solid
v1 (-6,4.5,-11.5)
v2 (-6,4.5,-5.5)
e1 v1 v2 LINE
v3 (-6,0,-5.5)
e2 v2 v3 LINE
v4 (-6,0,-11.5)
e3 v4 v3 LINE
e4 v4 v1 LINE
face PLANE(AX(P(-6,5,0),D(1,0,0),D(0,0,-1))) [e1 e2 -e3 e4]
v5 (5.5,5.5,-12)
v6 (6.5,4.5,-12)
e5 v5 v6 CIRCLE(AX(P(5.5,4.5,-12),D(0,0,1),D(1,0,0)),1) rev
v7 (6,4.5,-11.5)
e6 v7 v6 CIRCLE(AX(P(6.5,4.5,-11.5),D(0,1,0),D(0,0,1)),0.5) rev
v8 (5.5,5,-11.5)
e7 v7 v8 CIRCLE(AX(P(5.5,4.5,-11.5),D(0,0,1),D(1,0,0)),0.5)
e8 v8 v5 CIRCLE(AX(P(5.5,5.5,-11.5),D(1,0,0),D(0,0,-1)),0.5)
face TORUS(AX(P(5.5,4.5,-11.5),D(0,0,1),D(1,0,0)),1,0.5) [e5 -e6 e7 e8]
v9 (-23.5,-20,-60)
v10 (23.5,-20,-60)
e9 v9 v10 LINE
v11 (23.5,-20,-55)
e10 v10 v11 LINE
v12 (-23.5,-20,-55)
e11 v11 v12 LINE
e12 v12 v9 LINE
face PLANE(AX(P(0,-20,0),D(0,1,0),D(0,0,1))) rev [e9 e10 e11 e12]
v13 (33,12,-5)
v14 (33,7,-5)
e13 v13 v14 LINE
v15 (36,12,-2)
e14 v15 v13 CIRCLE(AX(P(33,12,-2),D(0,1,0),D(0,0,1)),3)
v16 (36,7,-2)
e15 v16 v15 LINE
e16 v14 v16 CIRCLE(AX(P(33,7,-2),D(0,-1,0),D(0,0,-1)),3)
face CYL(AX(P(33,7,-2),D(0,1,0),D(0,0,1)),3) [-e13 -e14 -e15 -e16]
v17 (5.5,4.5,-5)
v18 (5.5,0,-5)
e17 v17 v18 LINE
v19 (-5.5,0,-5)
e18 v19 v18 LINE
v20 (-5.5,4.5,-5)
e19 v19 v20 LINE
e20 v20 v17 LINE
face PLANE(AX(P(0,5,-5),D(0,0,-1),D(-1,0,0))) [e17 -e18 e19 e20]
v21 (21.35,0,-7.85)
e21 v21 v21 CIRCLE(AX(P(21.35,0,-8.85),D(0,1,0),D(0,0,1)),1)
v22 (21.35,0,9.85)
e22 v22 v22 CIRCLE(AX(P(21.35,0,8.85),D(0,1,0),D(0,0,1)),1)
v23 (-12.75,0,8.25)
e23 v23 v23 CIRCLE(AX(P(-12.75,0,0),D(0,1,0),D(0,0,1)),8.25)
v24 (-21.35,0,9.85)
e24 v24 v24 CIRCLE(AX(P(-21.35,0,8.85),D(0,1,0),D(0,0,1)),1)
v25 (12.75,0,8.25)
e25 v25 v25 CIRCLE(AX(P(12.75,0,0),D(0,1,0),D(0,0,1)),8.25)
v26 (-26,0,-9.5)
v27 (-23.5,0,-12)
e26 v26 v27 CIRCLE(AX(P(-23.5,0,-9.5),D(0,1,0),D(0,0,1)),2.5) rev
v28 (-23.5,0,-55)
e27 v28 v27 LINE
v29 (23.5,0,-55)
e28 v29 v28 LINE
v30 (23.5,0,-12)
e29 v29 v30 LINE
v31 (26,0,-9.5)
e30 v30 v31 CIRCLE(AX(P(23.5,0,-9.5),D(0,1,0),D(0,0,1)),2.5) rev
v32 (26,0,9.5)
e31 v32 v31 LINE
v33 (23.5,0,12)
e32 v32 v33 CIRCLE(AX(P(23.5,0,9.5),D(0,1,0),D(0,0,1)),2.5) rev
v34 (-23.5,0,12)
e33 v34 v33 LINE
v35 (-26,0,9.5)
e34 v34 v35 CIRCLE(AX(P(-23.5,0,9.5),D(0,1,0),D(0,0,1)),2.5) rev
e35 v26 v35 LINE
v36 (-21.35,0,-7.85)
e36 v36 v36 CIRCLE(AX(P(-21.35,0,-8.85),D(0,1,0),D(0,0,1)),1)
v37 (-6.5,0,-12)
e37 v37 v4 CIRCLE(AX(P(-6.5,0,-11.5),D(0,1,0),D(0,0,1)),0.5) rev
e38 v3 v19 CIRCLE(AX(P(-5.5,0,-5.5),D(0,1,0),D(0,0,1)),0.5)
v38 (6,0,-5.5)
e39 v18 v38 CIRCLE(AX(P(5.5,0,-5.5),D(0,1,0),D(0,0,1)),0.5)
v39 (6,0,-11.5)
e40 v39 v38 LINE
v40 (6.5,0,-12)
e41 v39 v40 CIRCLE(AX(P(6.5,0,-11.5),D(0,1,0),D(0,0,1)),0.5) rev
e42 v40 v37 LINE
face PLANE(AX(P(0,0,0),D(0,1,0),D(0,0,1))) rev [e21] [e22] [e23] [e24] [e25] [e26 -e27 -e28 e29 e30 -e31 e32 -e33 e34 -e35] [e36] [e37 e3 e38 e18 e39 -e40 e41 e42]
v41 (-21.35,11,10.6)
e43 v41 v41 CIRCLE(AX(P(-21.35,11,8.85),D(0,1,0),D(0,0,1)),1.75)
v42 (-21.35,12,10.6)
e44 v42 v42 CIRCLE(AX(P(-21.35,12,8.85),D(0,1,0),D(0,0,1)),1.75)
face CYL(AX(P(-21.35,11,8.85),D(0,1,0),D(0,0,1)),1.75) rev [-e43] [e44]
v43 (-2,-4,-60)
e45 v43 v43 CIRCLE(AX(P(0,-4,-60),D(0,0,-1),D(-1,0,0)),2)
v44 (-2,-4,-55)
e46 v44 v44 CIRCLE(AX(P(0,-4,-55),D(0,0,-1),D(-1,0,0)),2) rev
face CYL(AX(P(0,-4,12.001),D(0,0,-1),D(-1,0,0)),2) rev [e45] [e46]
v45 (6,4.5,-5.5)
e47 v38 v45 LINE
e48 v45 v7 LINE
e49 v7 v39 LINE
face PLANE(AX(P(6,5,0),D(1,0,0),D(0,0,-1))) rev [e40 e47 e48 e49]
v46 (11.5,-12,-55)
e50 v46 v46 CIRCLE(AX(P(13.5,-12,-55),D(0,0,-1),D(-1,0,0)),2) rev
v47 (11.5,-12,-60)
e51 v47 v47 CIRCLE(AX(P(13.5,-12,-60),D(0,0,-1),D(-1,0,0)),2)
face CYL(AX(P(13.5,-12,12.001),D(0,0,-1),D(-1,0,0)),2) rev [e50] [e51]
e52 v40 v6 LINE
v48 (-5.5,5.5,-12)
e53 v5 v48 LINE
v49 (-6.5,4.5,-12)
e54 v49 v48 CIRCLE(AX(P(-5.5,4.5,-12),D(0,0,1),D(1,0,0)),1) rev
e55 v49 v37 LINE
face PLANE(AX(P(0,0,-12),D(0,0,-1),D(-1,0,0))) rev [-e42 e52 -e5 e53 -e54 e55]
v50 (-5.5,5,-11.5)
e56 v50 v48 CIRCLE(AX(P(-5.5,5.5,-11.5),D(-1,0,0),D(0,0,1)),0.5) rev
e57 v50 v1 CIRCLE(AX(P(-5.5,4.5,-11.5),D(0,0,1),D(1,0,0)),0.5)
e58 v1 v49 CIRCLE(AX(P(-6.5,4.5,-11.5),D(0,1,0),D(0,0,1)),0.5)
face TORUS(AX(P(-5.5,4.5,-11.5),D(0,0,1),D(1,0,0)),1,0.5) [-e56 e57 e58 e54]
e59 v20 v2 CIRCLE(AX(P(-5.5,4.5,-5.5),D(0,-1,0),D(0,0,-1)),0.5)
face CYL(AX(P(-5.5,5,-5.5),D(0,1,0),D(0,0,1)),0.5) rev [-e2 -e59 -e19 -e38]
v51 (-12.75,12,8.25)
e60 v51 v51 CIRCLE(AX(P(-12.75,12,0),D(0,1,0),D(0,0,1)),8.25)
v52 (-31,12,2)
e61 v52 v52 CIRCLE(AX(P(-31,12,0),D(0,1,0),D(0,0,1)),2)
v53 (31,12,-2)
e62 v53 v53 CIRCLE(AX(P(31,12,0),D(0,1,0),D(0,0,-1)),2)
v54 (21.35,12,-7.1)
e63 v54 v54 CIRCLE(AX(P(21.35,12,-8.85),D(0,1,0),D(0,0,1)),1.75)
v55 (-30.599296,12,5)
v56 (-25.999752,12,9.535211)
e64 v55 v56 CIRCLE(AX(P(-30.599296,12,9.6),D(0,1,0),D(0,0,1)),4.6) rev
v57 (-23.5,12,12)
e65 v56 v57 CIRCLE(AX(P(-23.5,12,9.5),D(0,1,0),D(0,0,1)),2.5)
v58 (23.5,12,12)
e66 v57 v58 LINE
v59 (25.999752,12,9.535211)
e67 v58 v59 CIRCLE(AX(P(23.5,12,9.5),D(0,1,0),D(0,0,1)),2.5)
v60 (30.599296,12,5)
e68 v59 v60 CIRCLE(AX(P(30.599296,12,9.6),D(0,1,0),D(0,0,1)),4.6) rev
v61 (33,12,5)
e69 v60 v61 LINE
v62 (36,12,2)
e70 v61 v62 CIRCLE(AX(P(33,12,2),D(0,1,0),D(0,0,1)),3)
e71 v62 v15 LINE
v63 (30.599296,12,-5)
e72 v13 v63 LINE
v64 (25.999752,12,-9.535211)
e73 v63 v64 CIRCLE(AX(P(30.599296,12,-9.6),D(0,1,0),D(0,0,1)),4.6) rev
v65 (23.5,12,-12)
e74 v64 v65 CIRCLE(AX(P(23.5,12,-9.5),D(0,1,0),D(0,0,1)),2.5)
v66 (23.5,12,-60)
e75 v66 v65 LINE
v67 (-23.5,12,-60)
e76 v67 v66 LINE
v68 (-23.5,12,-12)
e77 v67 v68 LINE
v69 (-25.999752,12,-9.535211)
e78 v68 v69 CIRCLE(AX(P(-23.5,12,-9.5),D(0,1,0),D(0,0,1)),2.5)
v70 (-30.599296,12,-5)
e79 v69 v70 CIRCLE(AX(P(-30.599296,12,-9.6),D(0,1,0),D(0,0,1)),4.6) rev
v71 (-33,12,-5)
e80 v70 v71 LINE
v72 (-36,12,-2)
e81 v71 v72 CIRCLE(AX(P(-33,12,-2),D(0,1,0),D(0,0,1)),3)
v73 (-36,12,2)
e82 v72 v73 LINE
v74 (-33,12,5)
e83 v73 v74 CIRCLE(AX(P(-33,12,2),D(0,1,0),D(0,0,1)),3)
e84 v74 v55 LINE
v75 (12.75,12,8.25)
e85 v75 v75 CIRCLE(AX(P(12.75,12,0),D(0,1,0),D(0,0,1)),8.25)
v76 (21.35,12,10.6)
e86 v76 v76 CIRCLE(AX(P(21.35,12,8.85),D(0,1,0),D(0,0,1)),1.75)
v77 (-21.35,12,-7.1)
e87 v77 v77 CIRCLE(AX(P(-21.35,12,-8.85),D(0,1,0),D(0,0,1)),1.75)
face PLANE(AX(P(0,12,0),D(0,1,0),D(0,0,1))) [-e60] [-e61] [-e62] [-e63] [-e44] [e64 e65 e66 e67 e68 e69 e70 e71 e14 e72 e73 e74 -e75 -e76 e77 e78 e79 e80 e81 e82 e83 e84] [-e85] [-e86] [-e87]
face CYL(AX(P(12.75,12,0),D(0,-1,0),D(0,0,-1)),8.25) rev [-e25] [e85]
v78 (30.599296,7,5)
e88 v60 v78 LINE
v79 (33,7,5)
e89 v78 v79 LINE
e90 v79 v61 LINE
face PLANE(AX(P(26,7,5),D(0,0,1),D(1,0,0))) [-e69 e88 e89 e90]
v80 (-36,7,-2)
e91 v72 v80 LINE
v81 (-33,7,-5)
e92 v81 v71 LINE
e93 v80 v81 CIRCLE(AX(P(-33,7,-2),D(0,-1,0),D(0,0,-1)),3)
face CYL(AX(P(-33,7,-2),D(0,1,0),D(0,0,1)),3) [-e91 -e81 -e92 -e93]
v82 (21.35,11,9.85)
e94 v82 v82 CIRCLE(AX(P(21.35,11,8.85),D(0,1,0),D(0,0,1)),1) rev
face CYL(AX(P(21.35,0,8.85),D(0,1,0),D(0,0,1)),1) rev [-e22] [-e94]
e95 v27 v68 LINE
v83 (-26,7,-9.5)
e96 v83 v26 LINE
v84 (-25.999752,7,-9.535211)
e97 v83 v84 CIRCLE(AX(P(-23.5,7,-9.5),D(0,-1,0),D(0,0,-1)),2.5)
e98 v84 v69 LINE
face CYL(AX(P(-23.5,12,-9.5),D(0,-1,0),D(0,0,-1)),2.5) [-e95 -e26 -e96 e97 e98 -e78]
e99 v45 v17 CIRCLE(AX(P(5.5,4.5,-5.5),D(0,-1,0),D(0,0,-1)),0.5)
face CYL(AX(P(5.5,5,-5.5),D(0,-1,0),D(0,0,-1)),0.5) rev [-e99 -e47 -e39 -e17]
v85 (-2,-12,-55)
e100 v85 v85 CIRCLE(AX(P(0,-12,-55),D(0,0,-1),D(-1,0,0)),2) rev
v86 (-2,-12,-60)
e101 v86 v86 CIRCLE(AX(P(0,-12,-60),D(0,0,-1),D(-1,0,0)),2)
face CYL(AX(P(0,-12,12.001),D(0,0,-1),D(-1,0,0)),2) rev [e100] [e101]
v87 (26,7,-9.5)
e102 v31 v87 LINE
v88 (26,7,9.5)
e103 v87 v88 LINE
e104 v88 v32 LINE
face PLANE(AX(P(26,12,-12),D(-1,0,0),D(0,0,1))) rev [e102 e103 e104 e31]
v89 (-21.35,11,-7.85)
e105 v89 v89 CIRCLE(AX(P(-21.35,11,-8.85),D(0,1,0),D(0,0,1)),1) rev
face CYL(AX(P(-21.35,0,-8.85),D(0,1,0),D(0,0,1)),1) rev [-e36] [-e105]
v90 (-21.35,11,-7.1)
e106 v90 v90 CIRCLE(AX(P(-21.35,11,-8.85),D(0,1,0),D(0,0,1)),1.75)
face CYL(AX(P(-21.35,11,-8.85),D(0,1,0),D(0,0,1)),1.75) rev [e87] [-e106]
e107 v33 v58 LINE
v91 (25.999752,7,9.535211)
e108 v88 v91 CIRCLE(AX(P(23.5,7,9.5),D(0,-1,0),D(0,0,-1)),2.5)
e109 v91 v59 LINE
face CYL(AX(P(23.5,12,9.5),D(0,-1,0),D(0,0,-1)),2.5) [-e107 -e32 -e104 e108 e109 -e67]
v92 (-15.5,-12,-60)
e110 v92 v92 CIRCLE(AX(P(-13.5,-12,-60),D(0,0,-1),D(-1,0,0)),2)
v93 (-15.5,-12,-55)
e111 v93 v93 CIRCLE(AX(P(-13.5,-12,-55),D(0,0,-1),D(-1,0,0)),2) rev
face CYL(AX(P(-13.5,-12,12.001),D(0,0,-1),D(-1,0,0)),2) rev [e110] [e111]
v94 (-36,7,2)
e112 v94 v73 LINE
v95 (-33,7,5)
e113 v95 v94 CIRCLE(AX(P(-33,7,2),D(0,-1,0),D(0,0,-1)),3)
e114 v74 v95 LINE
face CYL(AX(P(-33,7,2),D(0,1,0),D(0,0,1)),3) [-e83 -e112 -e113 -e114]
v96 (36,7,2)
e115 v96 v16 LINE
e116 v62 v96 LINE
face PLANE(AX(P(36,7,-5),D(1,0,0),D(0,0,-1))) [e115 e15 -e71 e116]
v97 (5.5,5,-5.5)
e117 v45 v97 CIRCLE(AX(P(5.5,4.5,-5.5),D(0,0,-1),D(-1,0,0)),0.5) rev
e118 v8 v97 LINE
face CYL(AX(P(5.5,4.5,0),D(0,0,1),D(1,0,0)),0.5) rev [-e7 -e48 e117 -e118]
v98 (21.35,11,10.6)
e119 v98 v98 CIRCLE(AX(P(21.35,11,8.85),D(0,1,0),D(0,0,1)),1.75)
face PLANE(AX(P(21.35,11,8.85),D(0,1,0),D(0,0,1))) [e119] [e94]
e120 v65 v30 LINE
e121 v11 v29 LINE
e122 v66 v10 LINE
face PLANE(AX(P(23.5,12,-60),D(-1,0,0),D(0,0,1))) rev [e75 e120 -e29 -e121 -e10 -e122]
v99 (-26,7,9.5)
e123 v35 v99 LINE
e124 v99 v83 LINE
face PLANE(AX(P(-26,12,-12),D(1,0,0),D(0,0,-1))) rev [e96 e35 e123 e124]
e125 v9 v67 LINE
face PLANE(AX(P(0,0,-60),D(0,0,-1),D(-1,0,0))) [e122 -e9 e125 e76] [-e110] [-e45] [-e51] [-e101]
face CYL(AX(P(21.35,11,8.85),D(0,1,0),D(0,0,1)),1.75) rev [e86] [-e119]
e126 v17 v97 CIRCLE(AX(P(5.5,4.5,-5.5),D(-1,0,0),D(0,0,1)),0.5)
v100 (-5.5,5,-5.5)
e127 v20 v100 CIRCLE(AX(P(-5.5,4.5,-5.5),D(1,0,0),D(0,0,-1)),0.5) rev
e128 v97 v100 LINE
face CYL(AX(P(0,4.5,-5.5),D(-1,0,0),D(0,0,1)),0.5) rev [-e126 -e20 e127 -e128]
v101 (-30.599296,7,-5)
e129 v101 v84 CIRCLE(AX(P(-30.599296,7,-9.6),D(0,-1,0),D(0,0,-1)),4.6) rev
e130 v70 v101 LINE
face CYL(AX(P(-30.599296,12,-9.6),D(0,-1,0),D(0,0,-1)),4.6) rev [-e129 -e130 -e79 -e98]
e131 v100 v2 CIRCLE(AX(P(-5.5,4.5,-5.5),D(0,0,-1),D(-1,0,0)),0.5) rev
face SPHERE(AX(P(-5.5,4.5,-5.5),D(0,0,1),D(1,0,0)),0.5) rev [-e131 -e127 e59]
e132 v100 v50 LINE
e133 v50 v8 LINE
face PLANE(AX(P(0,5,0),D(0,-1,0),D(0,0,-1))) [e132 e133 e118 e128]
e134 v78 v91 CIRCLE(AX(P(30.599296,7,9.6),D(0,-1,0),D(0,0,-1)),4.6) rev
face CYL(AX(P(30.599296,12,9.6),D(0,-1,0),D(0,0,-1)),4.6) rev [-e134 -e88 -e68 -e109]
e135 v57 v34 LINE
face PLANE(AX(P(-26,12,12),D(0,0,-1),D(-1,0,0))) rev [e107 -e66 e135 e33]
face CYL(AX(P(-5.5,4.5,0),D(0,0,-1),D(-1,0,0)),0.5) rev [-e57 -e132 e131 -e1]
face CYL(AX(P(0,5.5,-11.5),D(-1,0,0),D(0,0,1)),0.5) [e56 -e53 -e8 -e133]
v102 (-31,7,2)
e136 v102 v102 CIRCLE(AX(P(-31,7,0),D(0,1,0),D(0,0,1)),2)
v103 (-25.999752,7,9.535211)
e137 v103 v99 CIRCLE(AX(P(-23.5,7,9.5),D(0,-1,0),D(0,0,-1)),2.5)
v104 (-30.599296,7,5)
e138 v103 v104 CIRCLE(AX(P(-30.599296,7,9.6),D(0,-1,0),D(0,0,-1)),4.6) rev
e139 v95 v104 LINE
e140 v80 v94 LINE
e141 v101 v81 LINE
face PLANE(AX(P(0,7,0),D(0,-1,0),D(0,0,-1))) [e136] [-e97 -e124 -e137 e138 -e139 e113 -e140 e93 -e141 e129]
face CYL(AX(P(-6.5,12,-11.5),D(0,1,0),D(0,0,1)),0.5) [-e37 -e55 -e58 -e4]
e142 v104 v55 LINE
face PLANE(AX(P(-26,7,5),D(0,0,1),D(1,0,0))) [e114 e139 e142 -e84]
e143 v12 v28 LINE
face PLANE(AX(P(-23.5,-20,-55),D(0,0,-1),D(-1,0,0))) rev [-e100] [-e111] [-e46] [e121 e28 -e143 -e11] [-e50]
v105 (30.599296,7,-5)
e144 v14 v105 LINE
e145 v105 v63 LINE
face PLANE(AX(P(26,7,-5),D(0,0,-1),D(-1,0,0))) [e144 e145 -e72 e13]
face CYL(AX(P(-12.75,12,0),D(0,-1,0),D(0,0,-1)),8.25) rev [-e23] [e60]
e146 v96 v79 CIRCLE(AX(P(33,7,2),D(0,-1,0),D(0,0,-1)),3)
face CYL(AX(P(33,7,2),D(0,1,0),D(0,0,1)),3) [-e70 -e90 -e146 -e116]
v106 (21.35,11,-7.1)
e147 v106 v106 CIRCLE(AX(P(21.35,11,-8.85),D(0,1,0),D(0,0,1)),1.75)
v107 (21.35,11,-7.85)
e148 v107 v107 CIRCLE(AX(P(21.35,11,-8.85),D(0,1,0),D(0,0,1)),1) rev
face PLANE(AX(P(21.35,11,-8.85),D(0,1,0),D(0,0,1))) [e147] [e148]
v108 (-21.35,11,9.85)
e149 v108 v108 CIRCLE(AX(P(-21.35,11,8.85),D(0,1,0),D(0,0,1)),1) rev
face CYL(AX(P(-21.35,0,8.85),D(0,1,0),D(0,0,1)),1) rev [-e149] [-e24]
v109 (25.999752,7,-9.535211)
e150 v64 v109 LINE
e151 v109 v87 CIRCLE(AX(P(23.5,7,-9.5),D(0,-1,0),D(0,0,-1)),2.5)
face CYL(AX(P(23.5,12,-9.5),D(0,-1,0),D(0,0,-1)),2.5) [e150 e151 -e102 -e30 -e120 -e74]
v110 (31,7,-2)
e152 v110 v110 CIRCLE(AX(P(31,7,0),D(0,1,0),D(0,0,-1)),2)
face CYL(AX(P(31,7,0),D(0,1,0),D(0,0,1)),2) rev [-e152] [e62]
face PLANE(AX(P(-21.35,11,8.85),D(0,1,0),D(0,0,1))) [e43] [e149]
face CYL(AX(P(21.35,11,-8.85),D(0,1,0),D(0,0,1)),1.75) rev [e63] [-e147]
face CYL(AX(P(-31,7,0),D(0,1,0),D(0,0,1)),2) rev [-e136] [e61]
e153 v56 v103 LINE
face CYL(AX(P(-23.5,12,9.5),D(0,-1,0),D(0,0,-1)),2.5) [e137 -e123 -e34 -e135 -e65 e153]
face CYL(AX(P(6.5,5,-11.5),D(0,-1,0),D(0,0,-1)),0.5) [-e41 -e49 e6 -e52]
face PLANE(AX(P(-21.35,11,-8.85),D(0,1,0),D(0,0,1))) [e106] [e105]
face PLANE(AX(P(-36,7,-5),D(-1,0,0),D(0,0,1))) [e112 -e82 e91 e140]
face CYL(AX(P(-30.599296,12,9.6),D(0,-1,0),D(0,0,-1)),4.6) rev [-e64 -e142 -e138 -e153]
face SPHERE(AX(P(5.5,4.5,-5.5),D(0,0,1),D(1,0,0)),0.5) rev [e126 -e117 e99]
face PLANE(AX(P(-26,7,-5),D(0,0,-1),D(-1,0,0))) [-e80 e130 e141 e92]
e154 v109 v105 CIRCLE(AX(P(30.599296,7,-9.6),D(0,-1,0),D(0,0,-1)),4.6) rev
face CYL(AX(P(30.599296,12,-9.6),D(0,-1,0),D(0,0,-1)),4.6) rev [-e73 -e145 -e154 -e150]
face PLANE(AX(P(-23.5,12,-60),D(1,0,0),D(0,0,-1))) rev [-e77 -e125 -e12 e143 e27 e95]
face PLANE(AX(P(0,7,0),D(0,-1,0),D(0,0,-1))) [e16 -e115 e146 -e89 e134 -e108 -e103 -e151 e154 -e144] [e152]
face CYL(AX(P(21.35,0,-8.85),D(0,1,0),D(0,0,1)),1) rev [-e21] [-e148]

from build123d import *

# Parameters (mm, degrees)
SKETCH1_W           = 52
SKETCH1_H           = 24
SKETCH1_R           = 8.25
BOSS_EXTRUDE1_DEPTH = 12
SKETCH2_R           = 1
CUT_EXTRUDE1_DEPTH  = 32.048349393
SKETCH3_R           = 1.75
CUT_EXTRUDE2_DEPTH  = 1
FILLET1_R           = 2.5
CUT_EXTRUDE3_DEPTH  = 5
FILLET2_R           = 0.5
SKETCH6_W           = 10
SKETCH6_H           = 10
SKETCH6_R           = 2
BOSS_EXTRUDE2_DEPTH = 5
FILLET3_R           = 4.6
FILLET4_R           = 3
SKETCH9_W           = 47
SKETCH9_H           = 12
BOSS_EXTRUDE3_DEPTH = 48
SKETCH11_W          = 47
SKETCH11_H          = 5
BOSS_EXTRUDE5_DEPTH = 20
CUT_EXTRUDE5_REACH  = 84.946
SKETCH13_R          = 2
CUT_EXTRUDE6_REACH  = 84.946
SKETCH16_R          = 2


with BuildPart() as part:
    # Sketch1 → Boss-Extrude1 (new body)
    with BuildSketch(Plane(origin=(0, 0, 0), x_dir=(1, 0, 0), z_dir=(0, 1, 0))):
        Rectangle(SKETCH1_W, SKETCH1_H)
        with Locations(Location((12.75, 0, 0), (0, 0, 270))):
            Circle(SKETCH1_R, mode=Mode.SUBTRACT)
        with Locations(Location((-12.75, 0, 0), (0, 0, 270))):
            Circle(SKETCH1_R, mode=Mode.SUBTRACT)
    extrude(amount=BOSS_EXTRUDE1_DEPTH)

    # Sketch2 → Cut-Extrude1 (cut, through all)
    with BuildSketch(Plane(origin=(0, 12, 0), x_dir=(1, 0, 0), z_dir=(0, 1, 0))):
        with Locations(Location((-21.35, 8.85, 0), (0, 0, 270))):
            Circle(SKETCH2_R)
        with Locations(Location((21.35, 8.85, 0), (0, 0, 270))):
            Circle(SKETCH2_R)
        with Locations(Location((21.35, -8.85, 0), (0, 0, 270))):
            Circle(SKETCH2_R)
        with Locations(Location((-21.35, -8.85, 0), (0, 0, 270))):
            Circle(SKETCH2_R)
    extrude(amount=-CUT_EXTRUDE1_DEPTH, mode=Mode.SUBTRACT)

    # Sketch3 → Cut-Extrude2 (cut)
    with BuildSketch(Plane(origin=(0, 12, 0), x_dir=(1, 0, 0), z_dir=(0, 1, 0))):
        with Locations(Location((-21.35, 8.85, 0), (0, 0, 270))):
            Circle(SKETCH3_R)
        with Locations(Location((21.35, 8.85, 0), (0, 0, 270))):
            Circle(SKETCH3_R)
        with Locations(Location((21.35, -8.85, 0), (0, 0, 270))):
            Circle(SKETCH3_R)
        with Locations(Location((-21.35, -8.85, 0), (0, 0, 270))):
            Circle(SKETCH3_R)
    extrude(amount=-CUT_EXTRUDE2_DEPTH, mode=Mode.SUBTRACT)

    # Fillet1
    fillet1_edges = [part.edges().sort_by_distance(p)[0] for p in [
        (26, 6, 12),
        (-26, 6, 12),
        (-26, 6, -12),
        (26, 6, -12),
    ]]
    fillet(fillet1_edges, radius=FILLET1_R)

    # Sketch4 → Cut-Extrude3 (cut)
    with BuildSketch(Plane.XZ):
        Polygon((-6, -5), (-6, -12), (6, -12), (6, -5), (0, -5), align=None)
    extrude(amount=-CUT_EXTRUDE3_DEPTH, mode=Mode.SUBTRACT)

    # Fillet2
    fillet2_edges = [part.edges().sort_by_distance(p)[0] for p in [
        (0, 5, -12),
        (6, 2.5, -12),
        (-6, 2.5, -12),
        (-6, 2.5, -5),
        (6, 5, -8.5),
        (6, 2.5, -5),
        (-6, 5, -8.5),
        (0, 5, -5),
    ]]
    fillet(fillet2_edges, radius=FILLET2_R)

    # Sketch6 → Boss-Extrude2 (add)
    # profile 1 of 2: a face of its own
    with BuildSketch(Plane(origin=(0, 12, 0), x_dir=(1, 0, 0), z_dir=(0, 1, 0))):
        with Locations((-31, 0)):
            Rectangle(SKETCH6_W, SKETCH6_H)
        with Locations(Location((-31, 0, 0), (0, 0, 270))):
            Circle(SKETCH6_R, mode=Mode.SUBTRACT)
    # profile 2 of 2: a face of its own
    with BuildSketch(Plane(origin=(0, 12, 0), x_dir=(1, 0, 0), z_dir=(0, 1, 0))):
        with Locations((31, 0)):
            Rectangle(SKETCH6_W, SKETCH6_H)
        with Locations(Location((31, 0, 0), (0, 0, 90))):
            Circle(SKETCH6_R, mode=Mode.SUBTRACT)
    extrude(amount=-BOSS_EXTRUDE2_DEPTH)

    # Fillet3
    # the kernel refuses this fillet: 4.6 mm, written as the material it adds along each edge
    with BuildSketch(Plane(origin=(26, 12, 5), x_dir=(-5.467859312132584e-05, 0, 0.9999999985051258), z_dir=(0, -1, 0)), Plane(origin=(-26, 12, -5), x_dir=(5.467859312132586e-05, 0, -0.9999999985051258), z_dir=(0, -1, 0))) as fillet3_piece_1:
        with BuildLine():
            CenterArc((4.59974851, -4.599547254), FILLET3_R, 90.80387664, 89.192990507)
            Line((-0.000251483, -4.599295733), (-0.460251482, -4.599270581))
            Line((-0.460251482, -4.599270581), (-0.459999999, 2.5152e-05))
            Line((-0.459999999, 2.5152e-05), (2.5152e-05, 0.459999999))
            ThreePointArc((2.5152e-05, 0.459999999), (4.500025145, 0.459753946), (4.528757551, 0.459954725))
            Line((4.528757551, 0.459954725), (4.535211274, 0))
        make_face()
    extrude(amount=5)
    with BuildSketch(Plane(origin=(-26, 12, 5), x_dir=(5.467859312289258e-05, 0, 0.9999999985051258), z_dir=(0, -1, 0)), Plane(origin=(26, 12, -5), x_dir=(-5.467859312132581e-05, 0, -0.9999999985051258), z_dir=(0, -1, 0))) as fillet3_piece_2:
        with BuildLine():
            CenterArc((4.59974851, 4.599547254), FILLET3_R, 180.003132853, 89.192990507)
            Line((-0.000251483, 4.599295733), (-0.460251482, 4.599270581))
            Line((-0.460251482, 4.599270581), (-0.459999999, -2.5152e-05))
            Line((-0.459999999, -2.5152e-05), (2.5152e-05, -0.459999999))
            ThreePointArc((2.5152e-05, -0.459999999), (4.500025145, -0.459753946), (4.528757551, -0.459954725))
            Line((4.528757551, -0.459954725), (4.535211274, 0))
        make_face()
    extrude(amount=5)

    # Fillet4
    fillet4_edges = [part.edges().sort_by_distance(p)[0] for p in [
        (-36, 9.5, 5),
        (-36, 9.5, -5),
        (36, 9.5, -5),
        (36, 9.5, 5),
    ]]
    fillet(fillet4_edges, radius=FILLET4_R)

    # Sketch9 → Boss-Extrude3 (add)
    with BuildSketch(Plane(origin=(0, 0, -12), x_dir=(-1, 0, 0), z_dir=(0, 0, -1))):
        with Locations((0, 6)):
            Rectangle(SKETCH9_W, SKETCH9_H)
    extrude(amount=BOSS_EXTRUDE3_DEPTH)

    # Sketch11 → Boss-Extrude5 (add)
    with BuildSketch(Plane.XZ):
        with Locations((0, -57.5)):
            Rectangle(SKETCH11_W, SKETCH11_H)
    extrude(amount=BOSS_EXTRUDE5_DEPTH)

    # Sketch13 → Cut-Extrude5 (cut, up to next)
    with BuildSketch(Plane(origin=(0, 0, -60), x_dir=(-1, 0, 0), z_dir=(0, 0, -1)), mode=Mode.PRIVATE) as cut_extrude5_sk1:
        with Locations((0, -12)):
            Circle(SKETCH13_R)
    cut_extrude5_tool1 = extrude(cut_extrude5_sk1.sketch, amount=-CUT_EXTRUDE5_REACH, mode=Mode.PRIVATE) & part.part
    # Sketch13 → Cut-Extrude5 (cut, up to next)
    with BuildSketch(Plane(origin=(0, 0, -60), x_dir=(-1, 0, 0), z_dir=(0, 0, -1)), mode=Mode.PRIVATE) as cut_extrude5_sk2:
        with Locations((-13.5, -12)):
            Circle(SKETCH13_R)
    cut_extrude5_tool2 = extrude(cut_extrude5_sk2.sketch, amount=-CUT_EXTRUDE5_REACH, mode=Mode.PRIVATE) & part.part
    # Sketch13 → Cut-Extrude5 (cut, up to next)
    with BuildSketch(Plane(origin=(0, 0, -60), x_dir=(-1, 0, 0), z_dir=(0, 0, -1)), mode=Mode.PRIVATE) as cut_extrude5_sk3:
        with Locations((13.5, -12)):
            Circle(SKETCH13_R)
    cut_extrude5_tool3 = extrude(cut_extrude5_sk3.sketch, amount=-CUT_EXTRUDE5_REACH, mode=Mode.PRIVATE) & part.part
    add(cut_extrude5_tool1.solids().sort_by_distance((0, -12, -60))[0], mode=Mode.SUBTRACT)
    add(cut_extrude5_tool2.solids().sort_by_distance((13.5, -12, -60))[0], mode=Mode.SUBTRACT)
    add(cut_extrude5_tool3.solids().sort_by_distance((-13.5, -12, -60))[0], mode=Mode.SUBTRACT)

    # Sketch16 → Cut-Extrude6 (cut, up to next)
    with BuildSketch(Plane(origin=(0, 0, -60), x_dir=(-1, 0, 0), z_dir=(0, 0, -1)), mode=Mode.PRIVATE) as cut_extrude6_sk1:
        with Locations((0, -4)):
            Circle(SKETCH16_R)
    cut_extrude6_tool1 = extrude(cut_extrude6_sk1.sketch, amount=-CUT_EXTRUDE6_REACH, mode=Mode.PRIVATE) & part.part
    add(cut_extrude6_tool1.solids().sort_by_distance((0, -4, -60))[0], mode=Mode.SUBTRACT)


solid = part.part
